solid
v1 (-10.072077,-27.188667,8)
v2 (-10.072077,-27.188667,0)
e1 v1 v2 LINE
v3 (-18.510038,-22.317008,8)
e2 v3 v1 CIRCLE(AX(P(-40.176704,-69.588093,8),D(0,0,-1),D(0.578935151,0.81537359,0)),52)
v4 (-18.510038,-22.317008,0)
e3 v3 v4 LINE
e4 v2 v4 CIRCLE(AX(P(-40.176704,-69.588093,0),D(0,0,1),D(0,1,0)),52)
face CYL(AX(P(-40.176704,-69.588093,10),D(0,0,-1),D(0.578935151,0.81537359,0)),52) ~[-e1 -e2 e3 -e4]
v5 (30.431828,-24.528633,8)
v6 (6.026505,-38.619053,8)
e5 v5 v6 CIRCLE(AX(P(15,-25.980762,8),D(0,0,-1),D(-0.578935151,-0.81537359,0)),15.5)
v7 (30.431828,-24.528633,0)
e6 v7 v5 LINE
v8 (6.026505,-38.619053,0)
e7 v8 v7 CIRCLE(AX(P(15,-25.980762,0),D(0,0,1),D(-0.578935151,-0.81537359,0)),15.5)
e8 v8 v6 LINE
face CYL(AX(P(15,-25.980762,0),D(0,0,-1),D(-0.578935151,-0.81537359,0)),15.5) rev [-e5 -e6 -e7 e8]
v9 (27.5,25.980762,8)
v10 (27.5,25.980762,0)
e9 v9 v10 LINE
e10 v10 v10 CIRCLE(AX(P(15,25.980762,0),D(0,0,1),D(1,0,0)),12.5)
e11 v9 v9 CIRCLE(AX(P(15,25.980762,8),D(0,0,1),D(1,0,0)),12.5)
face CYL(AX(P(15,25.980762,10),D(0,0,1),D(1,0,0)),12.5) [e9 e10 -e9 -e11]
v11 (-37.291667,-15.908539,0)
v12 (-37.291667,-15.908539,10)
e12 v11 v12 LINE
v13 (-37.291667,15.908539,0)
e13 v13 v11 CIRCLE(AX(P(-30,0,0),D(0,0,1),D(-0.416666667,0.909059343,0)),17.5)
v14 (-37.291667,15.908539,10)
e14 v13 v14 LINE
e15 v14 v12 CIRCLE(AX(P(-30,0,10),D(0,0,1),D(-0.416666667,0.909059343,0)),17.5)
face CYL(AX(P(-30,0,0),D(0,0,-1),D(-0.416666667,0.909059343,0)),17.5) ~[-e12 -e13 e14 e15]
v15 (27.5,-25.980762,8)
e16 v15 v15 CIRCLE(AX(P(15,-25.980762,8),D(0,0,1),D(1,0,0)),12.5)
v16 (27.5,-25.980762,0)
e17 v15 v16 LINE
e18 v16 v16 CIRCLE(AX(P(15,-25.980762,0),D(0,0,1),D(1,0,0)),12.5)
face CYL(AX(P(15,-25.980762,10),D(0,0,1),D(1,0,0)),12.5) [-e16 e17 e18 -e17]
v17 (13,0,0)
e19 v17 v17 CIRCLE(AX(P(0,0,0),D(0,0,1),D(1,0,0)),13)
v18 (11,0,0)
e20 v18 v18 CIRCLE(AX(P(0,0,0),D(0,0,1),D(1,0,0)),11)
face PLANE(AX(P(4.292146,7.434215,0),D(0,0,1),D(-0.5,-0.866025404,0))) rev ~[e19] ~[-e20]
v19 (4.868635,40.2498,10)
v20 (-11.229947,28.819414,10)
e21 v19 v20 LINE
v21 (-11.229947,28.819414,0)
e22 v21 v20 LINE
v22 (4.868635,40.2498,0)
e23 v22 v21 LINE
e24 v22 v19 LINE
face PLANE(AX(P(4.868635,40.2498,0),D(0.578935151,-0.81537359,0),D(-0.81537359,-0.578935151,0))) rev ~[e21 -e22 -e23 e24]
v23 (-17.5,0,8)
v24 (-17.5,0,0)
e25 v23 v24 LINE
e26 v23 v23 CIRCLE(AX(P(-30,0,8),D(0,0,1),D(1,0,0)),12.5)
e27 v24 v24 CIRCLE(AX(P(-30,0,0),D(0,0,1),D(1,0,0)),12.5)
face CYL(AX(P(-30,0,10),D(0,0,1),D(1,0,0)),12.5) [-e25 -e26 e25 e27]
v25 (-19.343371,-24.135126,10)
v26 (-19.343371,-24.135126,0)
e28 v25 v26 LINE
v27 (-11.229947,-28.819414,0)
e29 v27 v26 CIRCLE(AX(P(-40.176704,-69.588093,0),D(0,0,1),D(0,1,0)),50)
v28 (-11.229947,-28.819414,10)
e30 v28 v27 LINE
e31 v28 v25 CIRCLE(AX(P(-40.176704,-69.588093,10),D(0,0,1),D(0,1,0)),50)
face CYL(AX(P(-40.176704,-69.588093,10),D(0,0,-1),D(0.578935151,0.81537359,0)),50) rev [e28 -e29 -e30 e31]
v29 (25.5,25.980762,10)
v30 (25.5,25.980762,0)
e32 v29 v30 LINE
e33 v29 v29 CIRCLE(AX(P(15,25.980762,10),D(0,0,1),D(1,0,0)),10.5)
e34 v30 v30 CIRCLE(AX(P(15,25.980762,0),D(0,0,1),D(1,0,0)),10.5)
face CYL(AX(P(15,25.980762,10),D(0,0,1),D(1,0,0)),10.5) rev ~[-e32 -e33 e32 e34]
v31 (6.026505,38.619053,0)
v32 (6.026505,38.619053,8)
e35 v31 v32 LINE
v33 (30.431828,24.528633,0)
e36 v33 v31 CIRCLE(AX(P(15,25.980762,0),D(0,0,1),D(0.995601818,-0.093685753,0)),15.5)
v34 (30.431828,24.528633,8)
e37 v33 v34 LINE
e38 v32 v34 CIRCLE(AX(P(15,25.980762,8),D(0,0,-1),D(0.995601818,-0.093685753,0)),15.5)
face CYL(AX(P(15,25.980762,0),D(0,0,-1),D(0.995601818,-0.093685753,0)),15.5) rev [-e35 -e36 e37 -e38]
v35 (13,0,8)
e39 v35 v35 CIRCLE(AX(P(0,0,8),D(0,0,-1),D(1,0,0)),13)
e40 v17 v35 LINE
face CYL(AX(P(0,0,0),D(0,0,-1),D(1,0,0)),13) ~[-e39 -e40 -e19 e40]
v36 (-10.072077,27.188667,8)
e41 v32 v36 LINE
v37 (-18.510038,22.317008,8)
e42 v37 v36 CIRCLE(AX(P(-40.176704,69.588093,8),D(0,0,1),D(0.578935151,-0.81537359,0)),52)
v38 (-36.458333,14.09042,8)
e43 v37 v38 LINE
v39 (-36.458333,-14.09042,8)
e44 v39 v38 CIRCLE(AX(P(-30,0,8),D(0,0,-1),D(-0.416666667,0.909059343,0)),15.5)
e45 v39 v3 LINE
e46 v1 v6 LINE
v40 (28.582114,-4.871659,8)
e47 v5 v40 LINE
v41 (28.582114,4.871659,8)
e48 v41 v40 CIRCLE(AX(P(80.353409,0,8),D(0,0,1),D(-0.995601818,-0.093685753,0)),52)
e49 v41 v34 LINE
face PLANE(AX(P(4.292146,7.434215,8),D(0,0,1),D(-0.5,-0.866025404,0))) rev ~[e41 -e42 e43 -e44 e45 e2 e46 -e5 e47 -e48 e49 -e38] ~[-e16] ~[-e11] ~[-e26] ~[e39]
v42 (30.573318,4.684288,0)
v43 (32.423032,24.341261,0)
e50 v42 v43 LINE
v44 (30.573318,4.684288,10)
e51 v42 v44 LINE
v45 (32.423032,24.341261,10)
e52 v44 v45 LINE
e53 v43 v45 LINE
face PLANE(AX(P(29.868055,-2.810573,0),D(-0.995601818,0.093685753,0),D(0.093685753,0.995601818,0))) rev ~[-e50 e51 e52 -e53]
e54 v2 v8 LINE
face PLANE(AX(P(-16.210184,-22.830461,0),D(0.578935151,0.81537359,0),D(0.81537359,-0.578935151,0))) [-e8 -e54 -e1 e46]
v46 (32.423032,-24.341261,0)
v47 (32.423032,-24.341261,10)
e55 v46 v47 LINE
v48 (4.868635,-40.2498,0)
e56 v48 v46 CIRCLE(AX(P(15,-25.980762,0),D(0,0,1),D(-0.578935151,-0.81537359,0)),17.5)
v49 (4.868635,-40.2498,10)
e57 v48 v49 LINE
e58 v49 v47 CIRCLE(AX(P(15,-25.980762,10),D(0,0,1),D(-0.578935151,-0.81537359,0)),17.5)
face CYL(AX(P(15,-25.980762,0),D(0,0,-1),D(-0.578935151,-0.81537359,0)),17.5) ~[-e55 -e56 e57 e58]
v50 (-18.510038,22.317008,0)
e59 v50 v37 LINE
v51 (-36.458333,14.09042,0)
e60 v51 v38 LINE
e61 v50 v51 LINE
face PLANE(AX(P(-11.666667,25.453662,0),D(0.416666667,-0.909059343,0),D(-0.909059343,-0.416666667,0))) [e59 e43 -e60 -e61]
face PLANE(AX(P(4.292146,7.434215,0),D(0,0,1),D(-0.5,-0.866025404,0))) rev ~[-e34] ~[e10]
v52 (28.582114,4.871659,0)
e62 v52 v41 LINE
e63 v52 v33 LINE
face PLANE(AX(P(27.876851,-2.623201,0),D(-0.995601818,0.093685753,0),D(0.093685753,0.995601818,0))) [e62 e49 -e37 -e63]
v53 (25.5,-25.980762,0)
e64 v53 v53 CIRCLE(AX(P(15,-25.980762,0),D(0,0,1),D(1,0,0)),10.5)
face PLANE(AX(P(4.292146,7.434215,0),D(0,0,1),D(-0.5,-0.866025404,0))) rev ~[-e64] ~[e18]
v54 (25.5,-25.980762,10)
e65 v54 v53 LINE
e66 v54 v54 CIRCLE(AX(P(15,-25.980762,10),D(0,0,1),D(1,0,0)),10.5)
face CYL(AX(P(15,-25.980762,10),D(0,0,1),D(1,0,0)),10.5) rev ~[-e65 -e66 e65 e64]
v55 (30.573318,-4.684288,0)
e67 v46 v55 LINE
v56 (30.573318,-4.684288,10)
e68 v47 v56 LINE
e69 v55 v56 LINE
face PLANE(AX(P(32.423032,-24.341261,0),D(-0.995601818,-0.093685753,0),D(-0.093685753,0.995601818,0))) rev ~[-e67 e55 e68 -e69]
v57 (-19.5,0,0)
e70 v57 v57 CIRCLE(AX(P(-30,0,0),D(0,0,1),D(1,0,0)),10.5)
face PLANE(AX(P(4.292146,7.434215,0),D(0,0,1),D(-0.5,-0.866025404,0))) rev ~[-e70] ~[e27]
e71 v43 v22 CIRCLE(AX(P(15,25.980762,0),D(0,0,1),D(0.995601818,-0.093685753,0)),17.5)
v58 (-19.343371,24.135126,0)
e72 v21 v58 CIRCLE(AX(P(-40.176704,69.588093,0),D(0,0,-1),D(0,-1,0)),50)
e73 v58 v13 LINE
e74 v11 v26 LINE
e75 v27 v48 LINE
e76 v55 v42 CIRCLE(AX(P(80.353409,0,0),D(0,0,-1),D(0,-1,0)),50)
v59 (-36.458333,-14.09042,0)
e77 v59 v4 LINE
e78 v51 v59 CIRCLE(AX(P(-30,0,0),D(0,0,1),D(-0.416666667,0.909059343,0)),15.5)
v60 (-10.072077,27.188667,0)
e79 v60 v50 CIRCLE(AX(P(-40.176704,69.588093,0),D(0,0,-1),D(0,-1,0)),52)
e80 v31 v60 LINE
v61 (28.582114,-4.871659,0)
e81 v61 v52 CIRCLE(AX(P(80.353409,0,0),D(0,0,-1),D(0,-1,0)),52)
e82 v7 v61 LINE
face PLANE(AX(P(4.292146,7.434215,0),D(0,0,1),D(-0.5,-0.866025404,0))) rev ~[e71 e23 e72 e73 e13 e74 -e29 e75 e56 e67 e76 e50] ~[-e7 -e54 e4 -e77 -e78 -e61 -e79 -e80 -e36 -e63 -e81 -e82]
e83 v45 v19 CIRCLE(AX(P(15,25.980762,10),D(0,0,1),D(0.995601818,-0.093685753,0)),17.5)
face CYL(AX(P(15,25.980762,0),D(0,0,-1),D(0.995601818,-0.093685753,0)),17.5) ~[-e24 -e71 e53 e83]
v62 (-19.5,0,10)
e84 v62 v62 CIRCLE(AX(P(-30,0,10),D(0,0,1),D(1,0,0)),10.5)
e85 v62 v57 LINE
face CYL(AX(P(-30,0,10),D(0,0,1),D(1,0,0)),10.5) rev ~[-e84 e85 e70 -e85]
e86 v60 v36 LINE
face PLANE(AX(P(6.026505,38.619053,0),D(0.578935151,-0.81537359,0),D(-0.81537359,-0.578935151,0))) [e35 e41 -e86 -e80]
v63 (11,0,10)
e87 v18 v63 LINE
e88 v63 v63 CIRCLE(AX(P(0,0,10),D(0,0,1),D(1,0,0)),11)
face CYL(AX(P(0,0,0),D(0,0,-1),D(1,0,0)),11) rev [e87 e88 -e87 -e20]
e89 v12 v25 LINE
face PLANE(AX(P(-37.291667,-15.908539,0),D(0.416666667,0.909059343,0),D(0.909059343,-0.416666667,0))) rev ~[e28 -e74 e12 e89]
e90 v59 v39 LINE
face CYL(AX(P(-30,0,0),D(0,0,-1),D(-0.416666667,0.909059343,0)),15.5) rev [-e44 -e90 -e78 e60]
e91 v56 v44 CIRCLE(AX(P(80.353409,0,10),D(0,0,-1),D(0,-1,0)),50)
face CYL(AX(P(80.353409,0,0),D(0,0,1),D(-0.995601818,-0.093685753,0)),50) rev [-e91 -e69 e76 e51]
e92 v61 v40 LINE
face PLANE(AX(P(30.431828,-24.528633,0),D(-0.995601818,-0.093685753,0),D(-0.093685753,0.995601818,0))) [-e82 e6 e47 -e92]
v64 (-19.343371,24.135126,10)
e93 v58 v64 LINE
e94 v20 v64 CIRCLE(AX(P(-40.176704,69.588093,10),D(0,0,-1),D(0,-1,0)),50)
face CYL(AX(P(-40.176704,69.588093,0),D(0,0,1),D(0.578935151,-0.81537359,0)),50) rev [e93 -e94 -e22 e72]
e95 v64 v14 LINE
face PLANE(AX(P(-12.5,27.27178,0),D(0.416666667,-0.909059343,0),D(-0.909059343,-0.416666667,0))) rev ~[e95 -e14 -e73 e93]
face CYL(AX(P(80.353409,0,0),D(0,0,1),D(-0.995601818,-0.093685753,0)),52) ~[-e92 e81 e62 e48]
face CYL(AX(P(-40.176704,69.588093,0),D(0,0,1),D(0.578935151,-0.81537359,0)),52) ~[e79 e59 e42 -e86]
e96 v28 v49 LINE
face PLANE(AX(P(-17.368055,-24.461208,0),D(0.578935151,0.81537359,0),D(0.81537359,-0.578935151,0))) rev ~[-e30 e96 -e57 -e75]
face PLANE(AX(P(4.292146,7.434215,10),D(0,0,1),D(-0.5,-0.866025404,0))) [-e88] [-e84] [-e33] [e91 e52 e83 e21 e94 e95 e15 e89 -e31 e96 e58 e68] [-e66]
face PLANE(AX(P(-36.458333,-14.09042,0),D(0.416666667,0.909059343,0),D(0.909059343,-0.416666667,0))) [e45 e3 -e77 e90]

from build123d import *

# Parameters (mm, degrees)
F0_R     = 11
F1_DEPTH = 10
F2_COUNT = 3
F4_R     = 10.5
F5_DEPTH = 25
F6_R     = 50
F7_T     = -2


with BuildPart() as f1:
    # F0 (on Top) → F1 (new body)
    with BuildSketch(Plane.XY):
        with BuildLine():
            Line((-12.5, 27.2717802866), (-37.2916666667, 15.9085385005))
            ThreePointArc((-37.2916666667, 15.9085385005), (-47.5, 0), (-37.2916666667, -15.9085385005))
            Line((-37.2916666667, -15.9085385005), (-12.5, -27.2717802866))
            ThreePointArc((-12.5, -27.2717802866), (30, 0), (-12.5, 27.2717802866))
        make_face()
        Circle(F0_R, mode=Mode.SUBTRACT)
    extrude(amount=F1_DEPTH)


with BuildPart() as f2_1:
    # F2: instance of F1
    add(f1.part.rotate(Axis((0, 0, 0), (0, 0, -1)), 1 * 360 / F2_COUNT))


with BuildPart() as f2_2:
    # F2: instance of F1
    add(f1.part.rotate(Axis((0, 0, 0), (0, 0, -1)), 2 * 360 / F2_COUNT))


with BuildPart() as f1_1:
    add(f1.part)

    # F3: union F2_1, F2_2
    add(f2_1.part)
    add(f2_2.part)

    # F4 (on face) → F5 (cut)
    with BuildSketch(Plane.XY.offset(10)):
        with Locations((15, 25.9807621135)):
            Circle(F4_R)
        with Locations((15, -25.9807621135)):
            Circle(F4_R)
        with Locations((-30, 0)):
            Circle(F4_R)
    extrude(amount=-F5_DEPTH, mode=Mode.SUBTRACT)

    # F6
    f6_edges = [f1_1.edges().sort_by_distance(p)[0] for p in [
        (-15.066264, -26.095535, 5),
        (-15.066264, 26.095535, 5),
        (30.132528, 0, 5),
    ]]
    fillet(f6_edges, radius=F6_R)

    # F7
    f7_openings = [f1_1.faces().sort_by_distance(p)[0] for p in [
        (-27.825176, 18.947668, 0),
    ]]
    offset(amount=F7_T, openings=f7_openings)


solid = f1_1.part
